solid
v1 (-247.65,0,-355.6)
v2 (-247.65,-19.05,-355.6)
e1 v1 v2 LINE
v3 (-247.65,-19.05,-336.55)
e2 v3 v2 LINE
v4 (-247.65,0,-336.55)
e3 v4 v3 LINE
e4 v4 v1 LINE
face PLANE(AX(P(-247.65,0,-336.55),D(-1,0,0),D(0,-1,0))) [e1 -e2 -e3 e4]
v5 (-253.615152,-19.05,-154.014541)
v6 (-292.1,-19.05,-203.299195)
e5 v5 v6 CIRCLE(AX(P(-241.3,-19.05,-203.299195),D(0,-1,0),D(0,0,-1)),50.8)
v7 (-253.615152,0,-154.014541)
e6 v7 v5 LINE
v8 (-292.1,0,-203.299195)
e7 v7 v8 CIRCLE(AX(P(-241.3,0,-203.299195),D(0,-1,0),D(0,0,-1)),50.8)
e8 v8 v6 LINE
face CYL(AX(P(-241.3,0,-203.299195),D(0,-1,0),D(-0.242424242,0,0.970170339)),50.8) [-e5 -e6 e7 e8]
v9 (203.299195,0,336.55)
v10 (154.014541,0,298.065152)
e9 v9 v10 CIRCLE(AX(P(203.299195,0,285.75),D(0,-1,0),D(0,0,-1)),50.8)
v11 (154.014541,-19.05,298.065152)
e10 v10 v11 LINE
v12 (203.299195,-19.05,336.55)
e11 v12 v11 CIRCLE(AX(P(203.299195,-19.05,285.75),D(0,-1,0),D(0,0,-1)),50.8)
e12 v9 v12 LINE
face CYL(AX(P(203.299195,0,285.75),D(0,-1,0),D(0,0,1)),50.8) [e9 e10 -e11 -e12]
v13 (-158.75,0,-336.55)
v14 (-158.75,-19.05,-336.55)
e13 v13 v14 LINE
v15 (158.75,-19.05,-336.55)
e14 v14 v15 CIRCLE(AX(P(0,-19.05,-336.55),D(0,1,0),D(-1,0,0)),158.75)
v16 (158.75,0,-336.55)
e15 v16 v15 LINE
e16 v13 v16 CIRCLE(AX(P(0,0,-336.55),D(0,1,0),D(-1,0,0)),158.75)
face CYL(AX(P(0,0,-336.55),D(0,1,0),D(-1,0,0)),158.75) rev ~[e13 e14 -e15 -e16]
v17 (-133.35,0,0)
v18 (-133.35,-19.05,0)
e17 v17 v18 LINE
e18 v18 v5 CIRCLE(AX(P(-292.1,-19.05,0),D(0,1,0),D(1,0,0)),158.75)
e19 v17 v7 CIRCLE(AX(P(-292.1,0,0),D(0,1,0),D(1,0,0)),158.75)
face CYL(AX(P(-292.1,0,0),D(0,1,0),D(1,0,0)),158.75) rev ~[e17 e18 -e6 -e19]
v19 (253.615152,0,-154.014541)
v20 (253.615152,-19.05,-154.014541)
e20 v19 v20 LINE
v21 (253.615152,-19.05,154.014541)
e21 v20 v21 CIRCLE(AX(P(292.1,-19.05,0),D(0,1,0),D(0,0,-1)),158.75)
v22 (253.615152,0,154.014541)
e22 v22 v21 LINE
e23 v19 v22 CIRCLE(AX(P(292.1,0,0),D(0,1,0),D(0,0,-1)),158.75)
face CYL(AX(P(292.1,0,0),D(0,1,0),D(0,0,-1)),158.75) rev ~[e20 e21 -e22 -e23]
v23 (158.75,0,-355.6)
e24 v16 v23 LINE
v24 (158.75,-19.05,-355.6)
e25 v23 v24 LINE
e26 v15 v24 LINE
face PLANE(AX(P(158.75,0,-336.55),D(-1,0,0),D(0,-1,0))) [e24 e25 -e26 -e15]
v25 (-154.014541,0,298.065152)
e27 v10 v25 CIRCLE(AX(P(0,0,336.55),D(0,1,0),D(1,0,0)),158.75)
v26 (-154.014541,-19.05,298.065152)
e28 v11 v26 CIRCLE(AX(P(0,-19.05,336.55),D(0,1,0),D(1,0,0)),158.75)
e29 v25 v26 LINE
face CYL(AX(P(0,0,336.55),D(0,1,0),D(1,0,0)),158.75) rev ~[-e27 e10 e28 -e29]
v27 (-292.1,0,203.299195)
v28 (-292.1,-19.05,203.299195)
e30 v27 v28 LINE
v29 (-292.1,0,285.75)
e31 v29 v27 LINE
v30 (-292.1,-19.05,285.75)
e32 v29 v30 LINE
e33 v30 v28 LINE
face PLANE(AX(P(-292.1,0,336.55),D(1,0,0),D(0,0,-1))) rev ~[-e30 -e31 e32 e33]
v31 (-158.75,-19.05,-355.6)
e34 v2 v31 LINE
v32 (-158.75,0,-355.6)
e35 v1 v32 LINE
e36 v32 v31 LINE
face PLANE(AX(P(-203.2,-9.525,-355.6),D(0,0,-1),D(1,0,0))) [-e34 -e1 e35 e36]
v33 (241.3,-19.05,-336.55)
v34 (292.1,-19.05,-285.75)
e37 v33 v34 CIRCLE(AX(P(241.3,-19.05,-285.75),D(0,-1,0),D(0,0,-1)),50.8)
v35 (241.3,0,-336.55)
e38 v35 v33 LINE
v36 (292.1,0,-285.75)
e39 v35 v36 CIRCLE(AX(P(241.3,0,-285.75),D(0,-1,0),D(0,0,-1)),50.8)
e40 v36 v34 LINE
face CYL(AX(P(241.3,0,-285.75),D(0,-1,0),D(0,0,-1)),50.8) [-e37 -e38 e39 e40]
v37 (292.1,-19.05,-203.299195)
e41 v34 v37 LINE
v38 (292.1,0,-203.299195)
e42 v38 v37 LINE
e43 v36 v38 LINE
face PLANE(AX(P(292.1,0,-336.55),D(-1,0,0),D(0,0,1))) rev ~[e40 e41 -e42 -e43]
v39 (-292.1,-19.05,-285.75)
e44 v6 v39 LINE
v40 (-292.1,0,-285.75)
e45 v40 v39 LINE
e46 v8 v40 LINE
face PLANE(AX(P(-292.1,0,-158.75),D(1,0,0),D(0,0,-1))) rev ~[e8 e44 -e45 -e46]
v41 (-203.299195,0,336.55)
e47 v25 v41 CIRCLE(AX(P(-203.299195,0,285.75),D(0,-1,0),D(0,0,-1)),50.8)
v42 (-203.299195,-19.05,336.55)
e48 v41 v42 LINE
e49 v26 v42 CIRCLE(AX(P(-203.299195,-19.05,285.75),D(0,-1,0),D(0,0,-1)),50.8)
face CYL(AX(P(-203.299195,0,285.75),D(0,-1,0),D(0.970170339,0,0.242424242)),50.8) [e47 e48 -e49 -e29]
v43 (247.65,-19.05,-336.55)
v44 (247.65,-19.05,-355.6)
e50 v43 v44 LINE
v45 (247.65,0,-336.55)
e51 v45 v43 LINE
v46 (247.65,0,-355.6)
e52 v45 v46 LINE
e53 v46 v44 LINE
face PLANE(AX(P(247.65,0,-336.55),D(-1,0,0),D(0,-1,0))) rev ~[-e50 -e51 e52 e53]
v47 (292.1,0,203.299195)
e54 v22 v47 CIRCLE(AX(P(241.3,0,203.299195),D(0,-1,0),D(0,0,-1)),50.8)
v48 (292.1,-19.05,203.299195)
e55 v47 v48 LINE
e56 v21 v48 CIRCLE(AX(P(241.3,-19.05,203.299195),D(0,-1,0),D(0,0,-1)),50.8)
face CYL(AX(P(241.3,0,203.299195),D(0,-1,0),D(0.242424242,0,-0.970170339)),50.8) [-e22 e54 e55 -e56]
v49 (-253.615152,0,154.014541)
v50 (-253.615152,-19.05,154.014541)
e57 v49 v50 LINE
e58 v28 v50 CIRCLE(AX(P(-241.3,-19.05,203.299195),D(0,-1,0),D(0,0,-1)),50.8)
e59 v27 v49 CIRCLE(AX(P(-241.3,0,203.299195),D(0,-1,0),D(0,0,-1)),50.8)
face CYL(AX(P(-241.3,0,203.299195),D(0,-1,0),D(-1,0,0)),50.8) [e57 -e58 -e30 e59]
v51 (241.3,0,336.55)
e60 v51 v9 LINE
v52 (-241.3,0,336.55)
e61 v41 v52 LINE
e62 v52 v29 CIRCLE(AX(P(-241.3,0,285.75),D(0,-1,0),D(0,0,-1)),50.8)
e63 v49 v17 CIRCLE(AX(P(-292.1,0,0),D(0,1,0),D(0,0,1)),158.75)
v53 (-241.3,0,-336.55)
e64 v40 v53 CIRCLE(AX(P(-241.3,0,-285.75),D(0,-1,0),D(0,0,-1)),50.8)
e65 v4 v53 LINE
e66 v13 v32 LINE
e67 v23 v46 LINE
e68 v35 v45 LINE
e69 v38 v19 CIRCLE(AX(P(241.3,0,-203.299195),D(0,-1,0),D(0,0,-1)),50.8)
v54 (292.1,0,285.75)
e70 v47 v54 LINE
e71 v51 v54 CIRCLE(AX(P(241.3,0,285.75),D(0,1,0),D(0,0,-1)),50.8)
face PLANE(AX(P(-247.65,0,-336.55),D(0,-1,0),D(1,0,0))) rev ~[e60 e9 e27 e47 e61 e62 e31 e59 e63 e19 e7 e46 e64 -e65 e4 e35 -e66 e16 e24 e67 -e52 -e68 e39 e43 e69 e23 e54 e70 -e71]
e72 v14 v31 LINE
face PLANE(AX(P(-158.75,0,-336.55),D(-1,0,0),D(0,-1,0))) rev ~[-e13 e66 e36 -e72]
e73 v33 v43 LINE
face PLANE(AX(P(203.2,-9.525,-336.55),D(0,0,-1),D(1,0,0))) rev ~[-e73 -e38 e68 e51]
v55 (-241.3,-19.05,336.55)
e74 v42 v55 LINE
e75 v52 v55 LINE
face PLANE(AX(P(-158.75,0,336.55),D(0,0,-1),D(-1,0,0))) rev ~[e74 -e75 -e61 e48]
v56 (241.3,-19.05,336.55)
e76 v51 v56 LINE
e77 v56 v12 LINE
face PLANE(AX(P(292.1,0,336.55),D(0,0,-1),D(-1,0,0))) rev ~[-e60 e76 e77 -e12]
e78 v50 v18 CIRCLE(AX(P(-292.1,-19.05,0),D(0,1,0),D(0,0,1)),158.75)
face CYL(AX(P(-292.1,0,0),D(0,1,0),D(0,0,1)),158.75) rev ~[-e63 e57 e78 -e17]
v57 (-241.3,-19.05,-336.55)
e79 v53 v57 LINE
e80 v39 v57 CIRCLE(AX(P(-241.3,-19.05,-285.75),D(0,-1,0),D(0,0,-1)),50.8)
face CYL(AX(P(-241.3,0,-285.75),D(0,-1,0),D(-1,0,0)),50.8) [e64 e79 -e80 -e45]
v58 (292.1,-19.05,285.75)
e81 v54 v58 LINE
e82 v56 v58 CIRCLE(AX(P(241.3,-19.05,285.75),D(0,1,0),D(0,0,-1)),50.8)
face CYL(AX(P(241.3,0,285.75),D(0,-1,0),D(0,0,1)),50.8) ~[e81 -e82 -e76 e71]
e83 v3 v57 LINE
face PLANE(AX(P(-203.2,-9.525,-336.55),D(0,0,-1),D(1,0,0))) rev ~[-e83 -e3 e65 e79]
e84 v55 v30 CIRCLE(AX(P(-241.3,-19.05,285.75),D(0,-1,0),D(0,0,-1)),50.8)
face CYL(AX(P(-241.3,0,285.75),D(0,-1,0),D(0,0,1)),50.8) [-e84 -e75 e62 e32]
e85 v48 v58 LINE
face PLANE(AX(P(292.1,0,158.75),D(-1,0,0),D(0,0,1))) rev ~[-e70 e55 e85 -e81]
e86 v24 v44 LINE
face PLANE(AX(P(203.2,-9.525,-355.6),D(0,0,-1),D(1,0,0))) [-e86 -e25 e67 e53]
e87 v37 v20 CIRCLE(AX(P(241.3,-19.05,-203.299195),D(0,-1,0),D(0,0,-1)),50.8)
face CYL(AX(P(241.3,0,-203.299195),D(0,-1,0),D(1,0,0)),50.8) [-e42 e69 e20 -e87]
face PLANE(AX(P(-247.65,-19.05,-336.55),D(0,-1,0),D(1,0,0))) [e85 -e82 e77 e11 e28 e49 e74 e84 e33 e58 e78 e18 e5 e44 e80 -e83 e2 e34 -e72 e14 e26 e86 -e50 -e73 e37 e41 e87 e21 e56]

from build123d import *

# Parameters (mm, degrees)
F2_DEPTH = 19.05
F3_R     = 50.8
F4_W     = 88.9
F4_H     = 19.05
F5_DEPTH = 19.05


# Not quite as in the source:
# - a variable given as a bare number and used for a length is read in inches; the dataset says mm whatever the document's units were


with BuildPart() as f2:
    # F1 (on Front) → F2 (new body)
    with BuildSketch(Plane.XZ):
        with BuildLine():
            Line((292.1, 336.55), (158.75, 336.55))
            ThreePointArc((158.75, 336.55), (0, 177.8), (-158.75, 336.55))
            Line((-158.75, 336.55), (-292.1, 336.55))
            Line((-292.1, 336.55), (-292.1, 158.75))
            ThreePointArc((-292.1, 158.75), (-179.8467984866, 112.2532015134), (-133.35, 0))
            ThreePointArc((-133.35, 0), (-179.8467984866, -112.2532015134), (-292.1, -158.75))
            Line((-292.1, -158.75), (-292.1, -336.55))
            Line((-292.1, -336.55), (-158.75, -336.55))
            ThreePointArc((-158.75, -336.55), (0, -177.8), (158.75, -336.55))
            Line((158.75, -336.55), (292.1, -336.55))
            Line((292.1, -336.55), (292.1, -158.75))
            ThreePointArc((292.1, -158.75), (133.35, 0), (292.1, 158.75))
            Line((292.1, 158.75), (292.1, 336.55))
        make_face()
    extrude(amount=F2_DEPTH)

    # F3
    f3_edges = [f2.edges().sort_by_distance(p)[0] for p in [
        (158.75, -9.525, 336.55),
        (-158.75, -9.525, 336.55),
        (292.1, -9.525, 158.75),
        (292.1, -9.525, -158.75),
        (-292.1, -9.525, -158.75),
        (-292.1, -9.525, 158.75),
        (292.1, -9.525, -336.55),
        (-292.1, -9.525, -336.55),
        (292.1, -9.525, 336.55),
        (-292.1, -9.525, 336.55),
    ]]
    fillet(f3_edges, radius=F3_R)

    # F4 (on face) → F5 (join)
    with BuildSketch(Plane(origin=(0, 0, -336.55), x_dir=(1, 0, 0), z_dir=(0, 0, -1))):
        with Locations((-203.2, 9.525)):
            Rectangle(F4_W, F4_H)
        with Locations((203.2, 9.525)):
            Rectangle(F4_W, F4_H)
    extrude(amount=F5_DEPTH)


solid = f2.part
